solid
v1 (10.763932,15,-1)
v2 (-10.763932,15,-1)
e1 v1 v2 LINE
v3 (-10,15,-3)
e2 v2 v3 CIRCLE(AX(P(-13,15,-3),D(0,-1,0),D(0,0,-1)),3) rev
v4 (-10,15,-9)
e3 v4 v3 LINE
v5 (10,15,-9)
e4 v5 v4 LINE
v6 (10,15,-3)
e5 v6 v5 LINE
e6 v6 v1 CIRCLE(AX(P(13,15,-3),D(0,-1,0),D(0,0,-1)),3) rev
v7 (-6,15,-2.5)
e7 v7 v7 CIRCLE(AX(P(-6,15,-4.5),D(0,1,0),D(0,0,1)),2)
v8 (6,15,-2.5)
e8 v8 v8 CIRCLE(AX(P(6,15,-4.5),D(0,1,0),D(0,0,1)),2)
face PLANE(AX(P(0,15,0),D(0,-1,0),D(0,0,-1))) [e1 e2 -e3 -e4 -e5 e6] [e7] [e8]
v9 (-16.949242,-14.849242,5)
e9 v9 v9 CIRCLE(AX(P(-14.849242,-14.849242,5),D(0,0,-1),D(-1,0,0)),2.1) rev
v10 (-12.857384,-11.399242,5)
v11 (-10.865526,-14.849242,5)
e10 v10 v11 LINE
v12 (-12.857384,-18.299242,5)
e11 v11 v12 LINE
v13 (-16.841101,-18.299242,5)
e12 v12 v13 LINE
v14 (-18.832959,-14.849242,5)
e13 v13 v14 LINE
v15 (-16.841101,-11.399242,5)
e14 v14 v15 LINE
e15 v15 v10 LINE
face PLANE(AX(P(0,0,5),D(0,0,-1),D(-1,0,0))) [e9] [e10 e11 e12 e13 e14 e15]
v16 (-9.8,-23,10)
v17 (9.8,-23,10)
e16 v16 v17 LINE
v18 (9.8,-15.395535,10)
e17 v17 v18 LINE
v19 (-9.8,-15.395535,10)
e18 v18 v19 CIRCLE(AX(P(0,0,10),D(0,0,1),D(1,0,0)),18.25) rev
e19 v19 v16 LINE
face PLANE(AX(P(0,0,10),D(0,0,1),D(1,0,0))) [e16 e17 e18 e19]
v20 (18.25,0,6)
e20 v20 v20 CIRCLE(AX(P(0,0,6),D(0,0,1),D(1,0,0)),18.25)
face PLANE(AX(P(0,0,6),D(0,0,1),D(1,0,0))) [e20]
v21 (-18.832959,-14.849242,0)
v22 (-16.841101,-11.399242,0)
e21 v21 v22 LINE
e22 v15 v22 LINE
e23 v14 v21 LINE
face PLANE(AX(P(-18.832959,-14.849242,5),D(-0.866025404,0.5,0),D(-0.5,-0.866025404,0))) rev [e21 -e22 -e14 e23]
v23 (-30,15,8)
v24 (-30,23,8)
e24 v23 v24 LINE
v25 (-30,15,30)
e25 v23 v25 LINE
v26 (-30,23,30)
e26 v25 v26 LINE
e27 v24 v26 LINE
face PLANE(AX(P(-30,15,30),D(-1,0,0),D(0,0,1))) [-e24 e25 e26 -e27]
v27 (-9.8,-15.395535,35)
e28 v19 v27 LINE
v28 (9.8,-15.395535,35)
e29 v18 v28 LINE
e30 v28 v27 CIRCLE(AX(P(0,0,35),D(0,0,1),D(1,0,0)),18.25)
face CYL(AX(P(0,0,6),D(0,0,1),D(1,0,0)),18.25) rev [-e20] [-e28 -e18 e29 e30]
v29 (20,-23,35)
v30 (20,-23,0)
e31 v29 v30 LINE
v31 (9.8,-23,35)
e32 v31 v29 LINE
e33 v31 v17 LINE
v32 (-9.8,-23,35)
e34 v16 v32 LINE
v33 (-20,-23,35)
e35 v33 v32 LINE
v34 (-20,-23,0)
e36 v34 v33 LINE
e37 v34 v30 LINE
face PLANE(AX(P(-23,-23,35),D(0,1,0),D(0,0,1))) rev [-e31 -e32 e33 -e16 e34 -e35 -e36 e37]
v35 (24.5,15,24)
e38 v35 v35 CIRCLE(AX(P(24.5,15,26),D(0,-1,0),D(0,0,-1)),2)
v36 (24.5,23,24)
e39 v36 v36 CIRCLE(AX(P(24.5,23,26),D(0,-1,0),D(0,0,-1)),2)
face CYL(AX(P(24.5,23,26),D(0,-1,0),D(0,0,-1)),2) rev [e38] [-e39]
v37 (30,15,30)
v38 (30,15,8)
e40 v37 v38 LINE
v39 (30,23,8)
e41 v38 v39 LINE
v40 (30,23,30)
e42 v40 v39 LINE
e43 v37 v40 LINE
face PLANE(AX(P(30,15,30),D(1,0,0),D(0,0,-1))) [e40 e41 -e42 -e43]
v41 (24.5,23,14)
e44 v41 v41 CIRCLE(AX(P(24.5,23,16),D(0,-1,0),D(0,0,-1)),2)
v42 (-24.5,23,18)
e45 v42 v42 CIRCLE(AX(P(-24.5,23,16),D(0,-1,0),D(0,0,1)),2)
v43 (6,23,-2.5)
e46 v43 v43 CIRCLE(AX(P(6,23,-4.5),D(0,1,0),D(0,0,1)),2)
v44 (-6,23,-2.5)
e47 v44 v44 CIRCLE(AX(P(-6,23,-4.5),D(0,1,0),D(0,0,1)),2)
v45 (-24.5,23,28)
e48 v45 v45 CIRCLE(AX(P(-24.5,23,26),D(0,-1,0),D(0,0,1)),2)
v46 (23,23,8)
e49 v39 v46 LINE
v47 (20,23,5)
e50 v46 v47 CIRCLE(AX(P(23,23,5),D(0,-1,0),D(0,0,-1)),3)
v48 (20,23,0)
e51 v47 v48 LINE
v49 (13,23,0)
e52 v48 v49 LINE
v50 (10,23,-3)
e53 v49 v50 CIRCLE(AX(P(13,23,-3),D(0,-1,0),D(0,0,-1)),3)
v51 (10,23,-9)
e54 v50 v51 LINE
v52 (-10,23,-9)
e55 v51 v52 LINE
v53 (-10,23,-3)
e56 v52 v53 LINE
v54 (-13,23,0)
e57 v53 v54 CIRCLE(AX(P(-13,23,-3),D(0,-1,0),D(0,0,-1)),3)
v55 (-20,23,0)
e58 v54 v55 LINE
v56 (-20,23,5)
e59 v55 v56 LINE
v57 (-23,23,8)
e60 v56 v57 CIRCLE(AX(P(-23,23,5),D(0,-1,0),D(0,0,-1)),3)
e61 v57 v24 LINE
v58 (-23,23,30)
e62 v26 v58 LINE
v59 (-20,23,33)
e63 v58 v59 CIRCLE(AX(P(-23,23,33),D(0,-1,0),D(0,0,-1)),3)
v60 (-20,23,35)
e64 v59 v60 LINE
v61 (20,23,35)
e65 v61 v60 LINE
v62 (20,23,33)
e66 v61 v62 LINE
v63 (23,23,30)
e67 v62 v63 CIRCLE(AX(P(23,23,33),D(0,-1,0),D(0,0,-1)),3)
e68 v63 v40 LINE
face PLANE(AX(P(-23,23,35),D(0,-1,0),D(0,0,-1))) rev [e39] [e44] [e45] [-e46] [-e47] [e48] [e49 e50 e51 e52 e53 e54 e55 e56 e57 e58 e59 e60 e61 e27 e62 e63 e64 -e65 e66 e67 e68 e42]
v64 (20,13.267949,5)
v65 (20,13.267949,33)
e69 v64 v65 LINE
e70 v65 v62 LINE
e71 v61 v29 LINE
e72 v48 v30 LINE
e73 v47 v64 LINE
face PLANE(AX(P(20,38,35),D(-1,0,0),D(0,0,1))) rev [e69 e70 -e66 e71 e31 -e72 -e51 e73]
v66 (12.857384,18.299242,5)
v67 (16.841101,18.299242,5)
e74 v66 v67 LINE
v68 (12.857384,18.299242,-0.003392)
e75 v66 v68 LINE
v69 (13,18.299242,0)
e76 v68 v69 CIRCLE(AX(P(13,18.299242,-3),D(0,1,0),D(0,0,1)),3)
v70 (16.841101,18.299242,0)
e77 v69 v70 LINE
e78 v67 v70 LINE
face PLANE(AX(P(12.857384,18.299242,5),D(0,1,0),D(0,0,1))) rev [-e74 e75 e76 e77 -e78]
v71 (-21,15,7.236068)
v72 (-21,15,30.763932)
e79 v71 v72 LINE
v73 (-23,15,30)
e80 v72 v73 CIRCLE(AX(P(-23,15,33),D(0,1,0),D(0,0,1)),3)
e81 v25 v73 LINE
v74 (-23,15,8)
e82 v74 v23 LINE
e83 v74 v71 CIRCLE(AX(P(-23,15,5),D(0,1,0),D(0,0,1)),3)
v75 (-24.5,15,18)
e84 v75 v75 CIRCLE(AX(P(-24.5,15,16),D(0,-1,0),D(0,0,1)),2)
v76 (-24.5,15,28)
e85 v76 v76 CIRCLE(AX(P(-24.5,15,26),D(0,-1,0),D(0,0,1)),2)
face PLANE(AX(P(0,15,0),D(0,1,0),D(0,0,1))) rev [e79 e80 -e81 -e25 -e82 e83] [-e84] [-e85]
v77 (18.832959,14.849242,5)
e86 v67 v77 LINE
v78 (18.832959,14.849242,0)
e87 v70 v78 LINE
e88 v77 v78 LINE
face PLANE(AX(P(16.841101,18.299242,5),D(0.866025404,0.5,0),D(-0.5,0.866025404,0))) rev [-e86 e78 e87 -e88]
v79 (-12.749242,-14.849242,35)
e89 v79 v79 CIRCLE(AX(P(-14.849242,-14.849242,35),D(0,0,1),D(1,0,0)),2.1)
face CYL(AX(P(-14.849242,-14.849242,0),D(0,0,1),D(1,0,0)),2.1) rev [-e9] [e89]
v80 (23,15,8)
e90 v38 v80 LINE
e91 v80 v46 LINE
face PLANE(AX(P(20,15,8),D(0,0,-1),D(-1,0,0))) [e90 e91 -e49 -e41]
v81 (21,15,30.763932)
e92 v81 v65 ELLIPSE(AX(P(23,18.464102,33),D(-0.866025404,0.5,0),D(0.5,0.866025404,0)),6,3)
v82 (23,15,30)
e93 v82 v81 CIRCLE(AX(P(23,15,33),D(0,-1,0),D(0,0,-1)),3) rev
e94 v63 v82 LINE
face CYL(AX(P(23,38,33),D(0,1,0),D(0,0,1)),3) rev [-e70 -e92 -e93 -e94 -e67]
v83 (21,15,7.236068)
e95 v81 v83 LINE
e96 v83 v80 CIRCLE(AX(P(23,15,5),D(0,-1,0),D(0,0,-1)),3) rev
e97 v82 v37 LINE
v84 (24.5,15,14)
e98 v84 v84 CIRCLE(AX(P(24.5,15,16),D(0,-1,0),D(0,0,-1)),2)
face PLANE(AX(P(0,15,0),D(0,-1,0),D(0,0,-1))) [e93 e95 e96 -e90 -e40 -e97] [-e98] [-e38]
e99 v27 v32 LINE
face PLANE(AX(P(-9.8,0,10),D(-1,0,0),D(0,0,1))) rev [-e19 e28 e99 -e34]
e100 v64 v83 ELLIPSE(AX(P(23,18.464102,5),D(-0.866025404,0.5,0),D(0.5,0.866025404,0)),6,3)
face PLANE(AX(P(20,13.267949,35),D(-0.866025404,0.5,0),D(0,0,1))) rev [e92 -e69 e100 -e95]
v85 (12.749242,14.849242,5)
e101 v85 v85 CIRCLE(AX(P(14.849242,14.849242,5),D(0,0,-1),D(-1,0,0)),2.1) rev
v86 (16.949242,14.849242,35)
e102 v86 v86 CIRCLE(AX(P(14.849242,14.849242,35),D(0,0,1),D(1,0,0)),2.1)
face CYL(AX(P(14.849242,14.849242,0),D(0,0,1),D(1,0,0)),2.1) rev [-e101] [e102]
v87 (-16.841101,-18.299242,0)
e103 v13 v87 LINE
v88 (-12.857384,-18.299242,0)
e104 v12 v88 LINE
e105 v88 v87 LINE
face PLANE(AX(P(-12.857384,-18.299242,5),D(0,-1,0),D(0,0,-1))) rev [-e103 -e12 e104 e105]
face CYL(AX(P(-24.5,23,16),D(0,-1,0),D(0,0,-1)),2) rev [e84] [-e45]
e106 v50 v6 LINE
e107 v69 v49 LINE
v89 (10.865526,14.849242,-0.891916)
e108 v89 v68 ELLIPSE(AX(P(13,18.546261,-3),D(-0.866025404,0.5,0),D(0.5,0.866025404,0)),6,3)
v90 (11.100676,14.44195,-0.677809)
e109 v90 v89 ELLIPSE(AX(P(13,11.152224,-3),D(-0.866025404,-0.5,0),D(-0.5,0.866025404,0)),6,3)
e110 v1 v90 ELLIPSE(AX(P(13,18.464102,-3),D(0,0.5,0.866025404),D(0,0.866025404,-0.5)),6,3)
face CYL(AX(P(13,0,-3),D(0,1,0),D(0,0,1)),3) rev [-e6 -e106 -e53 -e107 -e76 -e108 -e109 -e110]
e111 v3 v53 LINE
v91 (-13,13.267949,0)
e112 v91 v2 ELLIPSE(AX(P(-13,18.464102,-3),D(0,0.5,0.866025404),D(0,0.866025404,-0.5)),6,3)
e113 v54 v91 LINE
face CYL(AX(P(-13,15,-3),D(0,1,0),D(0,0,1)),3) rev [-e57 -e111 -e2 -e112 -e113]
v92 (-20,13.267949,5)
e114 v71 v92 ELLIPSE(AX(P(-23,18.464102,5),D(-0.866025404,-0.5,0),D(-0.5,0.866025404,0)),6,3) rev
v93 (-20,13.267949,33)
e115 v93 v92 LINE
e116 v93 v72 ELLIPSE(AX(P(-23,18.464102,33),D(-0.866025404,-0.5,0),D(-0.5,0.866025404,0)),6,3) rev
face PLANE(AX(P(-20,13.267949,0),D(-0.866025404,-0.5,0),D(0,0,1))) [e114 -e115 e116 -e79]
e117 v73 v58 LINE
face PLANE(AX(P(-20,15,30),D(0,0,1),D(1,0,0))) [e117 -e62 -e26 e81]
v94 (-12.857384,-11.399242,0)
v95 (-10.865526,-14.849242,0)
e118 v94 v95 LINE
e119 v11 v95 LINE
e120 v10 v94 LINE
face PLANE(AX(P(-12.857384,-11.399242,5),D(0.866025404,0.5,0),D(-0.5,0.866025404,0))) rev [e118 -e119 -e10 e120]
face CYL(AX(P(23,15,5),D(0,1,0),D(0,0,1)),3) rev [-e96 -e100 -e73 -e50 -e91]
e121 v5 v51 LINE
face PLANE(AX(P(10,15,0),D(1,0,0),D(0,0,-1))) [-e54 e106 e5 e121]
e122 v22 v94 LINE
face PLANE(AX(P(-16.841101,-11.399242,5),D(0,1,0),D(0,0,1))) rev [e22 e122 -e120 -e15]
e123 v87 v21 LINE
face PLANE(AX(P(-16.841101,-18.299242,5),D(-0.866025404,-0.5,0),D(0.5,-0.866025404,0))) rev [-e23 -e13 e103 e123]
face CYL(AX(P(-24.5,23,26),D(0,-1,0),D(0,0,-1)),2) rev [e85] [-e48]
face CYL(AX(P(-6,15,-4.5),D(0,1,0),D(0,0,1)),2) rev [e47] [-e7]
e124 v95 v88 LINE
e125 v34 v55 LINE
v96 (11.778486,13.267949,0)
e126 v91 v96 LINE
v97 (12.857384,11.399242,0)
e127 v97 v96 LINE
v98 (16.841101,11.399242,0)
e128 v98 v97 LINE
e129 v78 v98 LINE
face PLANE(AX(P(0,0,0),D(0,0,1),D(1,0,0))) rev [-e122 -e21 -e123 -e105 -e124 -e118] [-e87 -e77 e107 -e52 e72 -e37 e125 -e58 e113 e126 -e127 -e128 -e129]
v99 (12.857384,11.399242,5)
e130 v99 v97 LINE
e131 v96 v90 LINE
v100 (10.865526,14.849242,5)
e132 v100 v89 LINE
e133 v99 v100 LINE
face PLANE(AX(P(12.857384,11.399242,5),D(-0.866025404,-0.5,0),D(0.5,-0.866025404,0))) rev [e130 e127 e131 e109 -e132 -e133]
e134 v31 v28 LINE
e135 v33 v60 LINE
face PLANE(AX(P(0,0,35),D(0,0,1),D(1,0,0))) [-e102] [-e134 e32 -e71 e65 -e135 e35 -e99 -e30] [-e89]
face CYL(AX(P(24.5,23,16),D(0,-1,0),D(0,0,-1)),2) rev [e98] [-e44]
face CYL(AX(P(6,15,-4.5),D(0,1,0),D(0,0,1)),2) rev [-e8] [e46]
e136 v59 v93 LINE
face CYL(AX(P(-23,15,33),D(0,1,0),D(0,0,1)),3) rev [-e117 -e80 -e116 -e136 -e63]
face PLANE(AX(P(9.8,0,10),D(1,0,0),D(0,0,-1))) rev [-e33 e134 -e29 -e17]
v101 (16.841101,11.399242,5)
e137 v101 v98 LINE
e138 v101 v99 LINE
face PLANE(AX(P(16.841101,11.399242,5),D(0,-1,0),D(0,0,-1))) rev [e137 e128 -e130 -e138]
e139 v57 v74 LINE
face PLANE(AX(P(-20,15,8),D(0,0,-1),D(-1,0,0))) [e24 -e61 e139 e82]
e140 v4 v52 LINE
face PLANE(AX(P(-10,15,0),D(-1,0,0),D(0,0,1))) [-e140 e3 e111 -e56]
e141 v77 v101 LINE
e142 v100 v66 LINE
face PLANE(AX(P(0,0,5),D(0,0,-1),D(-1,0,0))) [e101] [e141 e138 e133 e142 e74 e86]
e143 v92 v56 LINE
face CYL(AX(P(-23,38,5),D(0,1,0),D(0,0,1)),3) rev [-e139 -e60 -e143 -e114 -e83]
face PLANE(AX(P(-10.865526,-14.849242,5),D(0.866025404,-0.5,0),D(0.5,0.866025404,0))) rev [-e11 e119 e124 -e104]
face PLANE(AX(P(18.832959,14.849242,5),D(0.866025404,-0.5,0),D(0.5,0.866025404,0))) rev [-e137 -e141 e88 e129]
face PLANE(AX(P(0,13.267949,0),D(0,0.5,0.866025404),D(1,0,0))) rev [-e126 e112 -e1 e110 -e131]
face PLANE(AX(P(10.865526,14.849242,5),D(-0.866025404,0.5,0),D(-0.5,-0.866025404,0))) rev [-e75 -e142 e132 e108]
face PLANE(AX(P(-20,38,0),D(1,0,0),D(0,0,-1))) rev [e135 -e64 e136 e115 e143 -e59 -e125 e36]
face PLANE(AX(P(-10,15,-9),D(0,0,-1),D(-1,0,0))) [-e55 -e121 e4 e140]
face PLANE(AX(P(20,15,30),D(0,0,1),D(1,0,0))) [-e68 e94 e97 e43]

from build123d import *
from OCP.BRepFilletAPI import BRepFilletAPI_MakeChamfer

# Parameters (mm, degrees)
SKETCH_1_W          = 46
SKETCH_1_H          = 46
EXTRUDE_1_DEPTH     = 35
SKETCH_3_R          = 18.25
CUT_EXTRUDE_1_DEPTH = 29
CUT_EXTRUDE_2_DEPTH = 25
SKETCH_5_R          = 2.1
CUT_EXTRUDE_3_DEPTH = 48.780749262
CUT_EXTRUDE_4_DEPTH = 5
SKETCH_7_W          = 3
SKETCH_7_H          = 35
SKETCH_7_H_2        = 35.025411777
CUT_EXTRUDE_5_DEPTH = 61
SKETCH_8_W          = 10
SKETCH_8_H          = 22
SKETCH_8_W_2        = 20
SKETCH_8_H_2        = 9
SKETCH_8_R          = 2
EXTRUDE_2_DEPTH     = 8
SKETCH_9_R          = 2
CUT_EXTRUDE_6_DEPTH = 60.741108125
CHAMFER_1_SIZE      = 1
CHAMFER_1_SIZE2     = 1.732050808
FILLET_2_R          = 3


with BuildPart() as part:
    # 草图1 → 凸台-拉伸1 (new body)
    with BuildSketch(Plane.XY):
        Rectangle(SKETCH_1_W, SKETCH_1_H)
    extrude(amount=EXTRUDE_1_DEPTH)

    # 草图3 → 切除-拉伸1 (cut)
    with BuildSketch(Plane.XY.offset(35)):
        Circle(SKETCH_3_R)
    extrude(amount=-CUT_EXTRUDE_1_DEPTH, mode=Mode.SUBTRACT)

    # 草图4 → 切除-拉伸2 (cut)
    with BuildSketch(Plane.XY.offset(35)):
        with BuildLine():
            ThreePointArc((8.8, -15.988198773), (0, -18.25), (-8.8, -15.988198773))
            Line((-8.8, -15.988198773), (-8.8, -23))
            Line((-8.8, -23), (8.8, -23))
            Line((8.8, -23), (8.8, -15.988198773))
        make_face()
        with BuildLine():
            Line((-8.8, -23), (-8.8, -15.988198773))
            ThreePointArc((-8.8, -15.988198773), (-9.304719908, -15.699830809), (-9.8, -15.395535067))
            Line((-9.8, -15.395535067), (-9.8, -23))
            Line((-9.8, -23), (-8.8, -23))
        make_face()
        Polygon((-8.8, -23.08), (-8.8, -23), (-9.8, -23), (-9.8, -24.08), (9.8, -24.08), (9.8, -23), (8.8, -23), (8.8, -23.08), align=None)
        with BuildLine():
            ThreePointArc((9.8, -15.395535067), (9.304719908, -15.699830809), (8.8, -15.988198773))
            Line((8.8, -15.988198773), (8.8, -23))
            Line((8.8, -23), (9.8, -23))
            Line((9.8, -23), (9.8, -15.395535067))
        make_face()
    extrude(amount=-CUT_EXTRUDE_2_DEPTH, mode=Mode.SUBTRACT)

    # 草图5 → 切除-拉伸3 (cut, through all)
    with BuildSketch(Plane.XY.offset(35)):
        with Locations((-14.849242405, -14.849242405)):
            Circle(SKETCH_5_R)
        with Locations((14.849242405, 14.849242405)):
            Circle(SKETCH_5_R)
    extrude(amount=-CUT_EXTRUDE_3_DEPTH, mode=Mode.SUBTRACT)

    # 草图6 → 切除-拉伸4 (cut)
    with BuildSketch(Plane(origin=(0, 0, 0), x_dir=(-1, 0, 0), z_dir=(0, 0, -1))):
        Polygon((-10.865525548, 14.849242405), (-12.857383976, 18.299242405), (-16.841100834, 18.299242405), (-18.832959262, 14.849242405), (-16.841100834, 11.399242405), (-12.857383976, 11.399242405), align=None)
        Polygon((18.832959262, -14.849242405), (16.841100834, -11.399242405), (12.857383976, -11.399242405), (10.865525548, -14.849242405), (12.857383976, -18.299242405), (16.841100834, -18.299242405), align=None)
    extrude(amount=-CUT_EXTRUDE_4_DEPTH, mode=Mode.SUBTRACT)

    # 草图7 → 切除-拉伸5 (cut)
    with BuildSketch(Plane.XZ.offset(23)):
        with Locations((21.5, 17.5)):
            Rectangle(SKETCH_7_W, SKETCH_7_H)
        with Locations((-21.5, 17.512705889)):
            Rectangle(SKETCH_7_W, SKETCH_7_H_2)
    extrude(amount=-CUT_EXTRUDE_5_DEPTH, mode=Mode.SUBTRACT)

    # 草图8 → 凸台-拉伸2 (add)
    # profile 1 of 3: a face of its own
    with BuildSketch(Plane(origin=(0, 23, 0), x_dir=(1, 0, 0), z_dir=(0, 1, 0))):
        with Locations((25, -19)):
            Rectangle(SKETCH_8_W, SKETCH_8_H)
    # profile 2 of 3: a face of its own
    with BuildSketch(Plane(origin=(0, 23, 0), x_dir=(1, 0, 0), z_dir=(0, 1, 0))):
        with Locations((-25, -19)):
            Rectangle(SKETCH_8_W, SKETCH_8_H)
    # profile 3 of 3: a face of its own
    with BuildSketch(Plane(origin=(0, 23, 0), x_dir=(1, 0, 0), z_dir=(0, 1, 0))):
        with Locations((0, 4.5)):
            Rectangle(SKETCH_8_W_2, SKETCH_8_H_2)
        with Locations(Location((6, 4.5, 0), (0, 0, 270))):
            Circle(SKETCH_8_R, mode=Mode.SUBTRACT)
        with Locations(Location((-6, 4.5, 0), (0, 0, 270))):
            Circle(SKETCH_8_R, mode=Mode.SUBTRACT)
    extrude(amount=-EXTRUDE_2_DEPTH)

    # 草图9 → 切除-拉伸6 (cut, through all)
    with BuildSketch(Plane.XZ.offset(-15)):
        with Locations(Location((24.5, 26, 0), (0, 0, 270))):
            Circle(SKETCH_9_R)
        with Locations(Location((24.5, 16, 0), (0, 0, 270))):
            Circle(SKETCH_9_R)
        with Locations(Location((-24.5, 16, 0), (0, 0, 90))):
            Circle(SKETCH_9_R)
        with Locations(Location((-24.5, 26, 0), (0, 0, 90))):
            Circle(SKETCH_9_R)
    extrude(amount=-CUT_EXTRUDE_6_DEPTH, mode=Mode.SUBTRACT)

    # 倒角1: one chamfer whose edges measure the first distance from different faces: ONE call of the kernel's chamfer builder (chamfer() names one face for all edges)
    chamfer_1_edges_1 = [part.edges().sort_by_distance(p)[0] for p in [
        (20, 15, 19),
    ]]
    chamfer_1_side_1 = [part.faces().sort_by_distance(p)[0] for p in [
        (25.064486824, 15, 18.742052704),
    ]]
    chamfer_1_edges_2 = [part.edges().sort_by_distance(p)[0] for p in [
        (-20, 15, 19),
    ]]
    chamfer_1_side_2 = [part.faces().sort_by_distance(p)[0] for p in [
        (-25.064486824, 15, 18.742052704),
    ]]
    chamfer_1_edges_3 = [part.edges().sort_by_distance(p)[0] for p in [
        (0, 15, 0),
    ]]
    chamfer_1_side_3 = [part.faces().sort_by_distance(p)[0] for p in [
        (0, 15, -4.5),
    ]]
    chamfer_1 = BRepFilletAPI_MakeChamfer(part.part.solid().wrapped)
    for e in chamfer_1_edges_1:
        chamfer_1.Add(CHAMFER_1_SIZE, CHAMFER_1_SIZE2, e.wrapped, chamfer_1_side_1[0].wrapped)  # the first distance lies on this face
    for e in chamfer_1_edges_2:
        chamfer_1.Add(CHAMFER_1_SIZE, CHAMFER_1_SIZE2, e.wrapped, chamfer_1_side_2[0].wrapped)  # the first distance lies on this face
    for e in chamfer_1_edges_3:
        chamfer_1.Add(CHAMFER_1_SIZE, CHAMFER_1_SIZE2, e.wrapped, chamfer_1_side_3[0].wrapped)  # the first distance lies on this face
    add(Compound.cast(chamfer_1.Shape()), mode=Mode.REPLACE)

    # 圆角2
    # the kernel refuses this fillet: 3 mm, written as the material it adds along each edge
    with BuildSketch(Plane(origin=(-20, 23, 30), x_dir=(0, 0, 1), z_dir=(0, -1, 0))) as fillet_2_piece_1_section:
        with BuildLine():
            CenterArc((FILLET_2_R, FILLET_2_R), FILLET_2_R, 180, 90)
            Line((0, FILLET_2_R), (0, 0))
            Line((0, 0), (FILLET_2_R, 0))
        make_face()
    fillet_2_piece_1 = extrude(amount=17.232050808, mode=Mode.PRIVATE)
    fillet_2_piece_1 = split(fillet_2_piece_1, bisect_by=Plane(origin=(-20.640051051, 15, 30.684211078), z_dir=(0, 1, 0)), keep=Keep.TOP, mode=Mode.PRIVATE)
    add(fillet_2_piece_1)
    with BuildSketch(Plane(origin=(-20, 23, 30), x_dir=(0, 0, 1), z_dir=(0, -1, 0))) as fillet_2_piece_2_section:
        with BuildLine():
            CenterArc((FILLET_2_R, FILLET_2_R), FILLET_2_R, 180, 90)
            Line((0, FILLET_2_R), (0, 0))
            Line((0, 0), (FILLET_2_R, 0))
        make_face()
    fillet_2_piece_2 = extrude(amount=17.232050808, mode=Mode.PRIVATE)
    fillet_2_piece_2 = split(fillet_2_piece_2, bisect_by=Plane(origin=(-20.542525514, 14.207630947, 30.942273677), z_dir=(0.8660254037844399, 0.49999999999999784, 0)), keep=Keep.TOP, mode=Mode.PRIVATE)
    add(fillet_2_piece_2)
    with BuildSketch(Plane(origin=(-20, 5.767949192, 8), x_dir=(0, 0, -1), z_dir=(0, 1, 0))) as fillet_2_piece_3_section:
        with BuildLine():
            CenterArc((FILLET_2_R, FILLET_2_R), FILLET_2_R, 180, 90)
            Line((0, FILLET_2_R), (0, 0))
            Line((0, 0), (FILLET_2_R, 0))
        make_face()
    fillet_2_piece_3 = extrude(amount=17.232050808, mode=Mode.PRIVATE)
    fillet_2_piece_3 = split(fillet_2_piece_3, bisect_by=Plane(origin=(-21.788039326, 15, 7.854673445), z_dir=(0, 1, 0)), keep=Keep.TOP, mode=Mode.PRIVATE)
    add(fillet_2_piece_3)
    with BuildSketch(Plane(origin=(-20, 5.767949192, 8), x_dir=(0, 0, -1), z_dir=(0, 1, 0))) as fillet_2_piece_4_section:
        with BuildLine():
            CenterArc((FILLET_2_R, FILLET_2_R), FILLET_2_R, 180, 90)
            Line((0, FILLET_2_R), (0, 0))
            Line((0, 0), (FILLET_2_R, 0))
        make_face()
    fillet_2_piece_4 = extrude(amount=17.232050808, mode=Mode.PRIVATE)
    fillet_2_piece_4 = split(fillet_2_piece_4, bisect_by=Plane(origin=(-20.542525514, 14.207630947, 7.057726323), z_dir=(0.8660254037844399, 0.49999999999999784, 0)), keep=Keep.TOP, mode=Mode.PRIVATE)
    add(fillet_2_piece_4)
    with BuildSketch(Plane(origin=(-10, 23, 0), x_dir=(-1, 0, 0), z_dir=(0, -1, 0))) as fillet_2_piece_5_section:
        with BuildLine():
            CenterArc((FILLET_2_R, FILLET_2_R), FILLET_2_R, 180, 90)
            Line((0, FILLET_2_R), (0, 0))
            Line((0, 0), (FILLET_2_R, 0))
        make_face()
    fillet_2_piece_5 = extrude(amount=17.232050808, mode=Mode.PRIVATE)
    fillet_2_piece_5 = split(fillet_2_piece_5, bisect_by=Plane(origin=(-10.684211078, 17.911025018, -2.680681078), z_dir=(0, 0.49999999999999784, 0.8660254037844399)), keep=Keep.TOP, mode=Mode.PRIVATE)
    add(fillet_2_piece_5)
    with BuildSketch(Plane(origin=(-10, 30.5, 0), x_dir=(-1, 0, 0), z_dir=(0, -1, 0))) as fillet_2_piece_6_section:
        with BuildLine():
            CenterArc((FILLET_2_R, FILLET_2_R), FILLET_2_R, 180, 90)
            Line((0, FILLET_2_R), (0, 0))
            Line((0, 0), (FILLET_2_R, 0))
        make_face()
    fillet_2_piece_6 = extrude(amount=24.732050808, mode=Mode.PRIVATE)
    fillet_2_piece_6 = split(fillet_2_piece_6, bisect_by=Plane(origin=(-10.145326555, 15, -1.788039326), z_dir=(0, 1, 0)), keep=Keep.TOP, mode=Mode.PRIVATE)
    fillet_2_piece_6 = split(fillet_2_piece_6, bisect_by=Plane(origin=(-10.145326555, 15.853077594, -1.492524579), z_dir=(0, -0.49999999999999784, -0.8660254037844399)), keep=Keep.TOP, mode=Mode.PRIVATE)
    add(fillet_2_piece_6)
    with BuildSketch(Plane(origin=(10, 5.767949192, 0), x_dir=(1, 0, 0), z_dir=(0, 1, 0))) as fillet_2_piece_7_section:
        with BuildLine():
            CenterArc((FILLET_2_R, FILLET_2_R), FILLET_2_R, 180, 90)
            Line((0, FILLET_2_R), (0, 0))
            Line((0, 0), (FILLET_2_R, 0))
        make_face()
    fillet_2_piece_7 = extrude(amount=24.732050808, mode=Mode.PRIVATE)
    fillet_2_piece_7 = split(fillet_2_piece_7, bisect_by=Plane(origin=(11.207909256, 14.256216426, -0.228184972), z_dir=(-0.8660254037844387, -0.5, 0)), keep=Keep.TOP, mode=Mode.PRIVATE)
    fillet_2_piece_7 = split(fillet_2_piece_7, bisect_by=Plane(origin=(10.865578652, 13.959723109, -0.399395857), z_dir=(0, 0.49999999999999784, 0.8660254037844399)), keep=Keep.TOP, mode=Mode.PRIVATE)
    add(fillet_2_piece_7)
    with BuildSketch(Plane(origin=(10, 5.767949192, 0), x_dir=(1, 0, 0), z_dir=(0, 1, 0))) as fillet_2_piece_8_section:
        with BuildLine():
            CenterArc((FILLET_2_R, FILLET_2_R), FILLET_2_R, 180, 90)
            Line((0, FILLET_2_R), (0, 0))
            Line((0, 0), (FILLET_2_R, 0))
        make_face()
    fillet_2_piece_8 = extrude(amount=17.232050808, mode=Mode.PRIVATE)
    fillet_2_piece_8 = split(fillet_2_piece_8, bisect_by=Plane(origin=(10.956075536, 15.006079586, -1.705008592), z_dir=(-0.8660254037844386, 0.5000000000000001, 0)), keep=Keep.TOP, mode=Mode.PRIVATE)
    fillet_2_piece_8 = split(fillet_2_piece_8, bisect_by=Plane(origin=(10.158078867, 15, -1.705008592), z_dir=(0, 1, 0)), keep=Keep.TOP, mode=Mode.PRIVATE)
    add(fillet_2_piece_8)
    with BuildSketch(Plane(origin=(10, 5.767949192, 0), x_dir=(1, 0, 0), z_dir=(0, 1, 0))) as fillet_2_piece_9_section:
        with BuildLine():
            CenterArc((FILLET_2_R, FILLET_2_R), FILLET_2_R, 180, 90)
            Line((0, FILLET_2_R), (0, 0))
            Line((0, 0), (FILLET_2_R, 0))
        make_face()
    fillet_2_piece_9 = extrude(amount=17.232050808, mode=Mode.PRIVATE)
    fillet_2_piece_9 = split(fillet_2_piece_9, bisect_by=Plane(origin=(10.908693088, 14.924010778, -0.446987958), z_dir=(-0.8660254037844386, 0.5000000000000001, 0)), keep=Keep.TOP, mode=Mode.PRIVATE)
    fillet_2_piece_9 = split(fillet_2_piece_9, bisect_by=Plane(origin=(10.864092139, 14.722859622, -0.839992928), z_dir=(0, 0.49999999999999784, 0.8660254037844399)), keep=Keep.TOP, mode=Mode.PRIVATE)
    add(fillet_2_piece_9)
    with BuildSketch(Plane(origin=(10, 5.767949192, 0), x_dir=(1, 0, 0), z_dir=(0, 1, 0))) as fillet_2_piece_10_section:
        with BuildLine():
            CenterArc((FILLET_2_R, FILLET_2_R), FILLET_2_R, 180, 90)
            Line((0, FILLET_2_R), (0, 0))
            Line((0, 0), (FILLET_2_R, 0))
        make_face()
    fillet_2_piece_10 = extrude(amount=17.232050808, mode=Mode.PRIVATE)
    fillet_2_piece_10 = split(fillet_2_piece_10, bisect_by=Plane(origin=(12.9144267, 18.299242405, -0.000678235), z_dir=(0, 1, 0)), keep=Keep.TOP, mode=Mode.PRIVATE)
    add(fillet_2_piece_10)
    with BuildSketch(Plane(origin=(20, 23, 8), x_dir=(0, 0, -1), z_dir=(0, -1, 0))) as fillet_2_piece_11_section:
        with BuildLine():
            CenterArc((FILLET_2_R, FILLET_2_R), FILLET_2_R, 180, 90)
            Line((0, FILLET_2_R), (0, 0))
            Line((0, 0), (FILLET_2_R, 0))
        make_face()
    fillet_2_piece_11 = extrude(amount=17.232050808, mode=Mode.PRIVATE)
    fillet_2_piece_11 = split(fillet_2_piece_11, bisect_by=Plane(origin=(20.640051051, 15, 7.315788922), z_dir=(0, 1, 0)), keep=Keep.TOP, mode=Mode.PRIVATE)
    add(fillet_2_piece_11)
    with BuildSketch(Plane(origin=(20, 23, 8), x_dir=(0, 0, -1), z_dir=(0, -1, 0))) as fillet_2_piece_12_section:
        with BuildLine():
            CenterArc((FILLET_2_R, FILLET_2_R), FILLET_2_R, 180, 90)
            Line((0, FILLET_2_R), (0, 0))
            Line((0, 0), (FILLET_2_R, 0))
        make_face()
    fillet_2_piece_12 = extrude(amount=17.232050808, mode=Mode.PRIVATE)
    fillet_2_piece_12 = split(fillet_2_piece_12, bisect_by=Plane(origin=(20.542525514, 14.207630947, 7.057726323), z_dir=(-0.8660254037844399, 0.49999999999999784, 0)), keep=Keep.TOP, mode=Mode.PRIVATE)
    add(fillet_2_piece_12)
    with BuildSketch(Plane(origin=(20, 5.767949192, 30), x_dir=(0, 0, 1), z_dir=(0, 1, 0))) as fillet_2_piece_13_section:
        with BuildLine():
            CenterArc((FILLET_2_R, FILLET_2_R), FILLET_2_R, 180, 90)
            Line((0, FILLET_2_R), (0, 0))
            Line((0, 0), (FILLET_2_R, 0))
        make_face()
    fillet_2_piece_13 = extrude(amount=17.232050808, mode=Mode.PRIVATE)
    fillet_2_piece_13 = split(fillet_2_piece_13, bisect_by=Plane(origin=(21.788039326, 15, 30.145326555), z_dir=(0, 1, 0)), keep=Keep.TOP, mode=Mode.PRIVATE)
    add(fillet_2_piece_13)
    with BuildSketch(Plane(origin=(20, 5.767949192, 30), x_dir=(0, 0, 1), z_dir=(0, 1, 0))) as fillet_2_piece_14_section:
        with BuildLine():
            CenterArc((FILLET_2_R, FILLET_2_R), FILLET_2_R, 180, 90)
            Line((0, FILLET_2_R), (0, 0))
            Line((0, 0), (FILLET_2_R, 0))
        make_face()
    fillet_2_piece_14 = extrude(amount=17.232050808, mode=Mode.PRIVATE)
    fillet_2_piece_14 = split(fillet_2_piece_14, bisect_by=Plane(origin=(20.542525514, 14.207630947, 30.942273677), z_dir=(-0.8660254037844399, 0.49999999999999784, 0)), keep=Keep.TOP, mode=Mode.PRIVATE)
    add(fillet_2_piece_14)


solid = part.part
